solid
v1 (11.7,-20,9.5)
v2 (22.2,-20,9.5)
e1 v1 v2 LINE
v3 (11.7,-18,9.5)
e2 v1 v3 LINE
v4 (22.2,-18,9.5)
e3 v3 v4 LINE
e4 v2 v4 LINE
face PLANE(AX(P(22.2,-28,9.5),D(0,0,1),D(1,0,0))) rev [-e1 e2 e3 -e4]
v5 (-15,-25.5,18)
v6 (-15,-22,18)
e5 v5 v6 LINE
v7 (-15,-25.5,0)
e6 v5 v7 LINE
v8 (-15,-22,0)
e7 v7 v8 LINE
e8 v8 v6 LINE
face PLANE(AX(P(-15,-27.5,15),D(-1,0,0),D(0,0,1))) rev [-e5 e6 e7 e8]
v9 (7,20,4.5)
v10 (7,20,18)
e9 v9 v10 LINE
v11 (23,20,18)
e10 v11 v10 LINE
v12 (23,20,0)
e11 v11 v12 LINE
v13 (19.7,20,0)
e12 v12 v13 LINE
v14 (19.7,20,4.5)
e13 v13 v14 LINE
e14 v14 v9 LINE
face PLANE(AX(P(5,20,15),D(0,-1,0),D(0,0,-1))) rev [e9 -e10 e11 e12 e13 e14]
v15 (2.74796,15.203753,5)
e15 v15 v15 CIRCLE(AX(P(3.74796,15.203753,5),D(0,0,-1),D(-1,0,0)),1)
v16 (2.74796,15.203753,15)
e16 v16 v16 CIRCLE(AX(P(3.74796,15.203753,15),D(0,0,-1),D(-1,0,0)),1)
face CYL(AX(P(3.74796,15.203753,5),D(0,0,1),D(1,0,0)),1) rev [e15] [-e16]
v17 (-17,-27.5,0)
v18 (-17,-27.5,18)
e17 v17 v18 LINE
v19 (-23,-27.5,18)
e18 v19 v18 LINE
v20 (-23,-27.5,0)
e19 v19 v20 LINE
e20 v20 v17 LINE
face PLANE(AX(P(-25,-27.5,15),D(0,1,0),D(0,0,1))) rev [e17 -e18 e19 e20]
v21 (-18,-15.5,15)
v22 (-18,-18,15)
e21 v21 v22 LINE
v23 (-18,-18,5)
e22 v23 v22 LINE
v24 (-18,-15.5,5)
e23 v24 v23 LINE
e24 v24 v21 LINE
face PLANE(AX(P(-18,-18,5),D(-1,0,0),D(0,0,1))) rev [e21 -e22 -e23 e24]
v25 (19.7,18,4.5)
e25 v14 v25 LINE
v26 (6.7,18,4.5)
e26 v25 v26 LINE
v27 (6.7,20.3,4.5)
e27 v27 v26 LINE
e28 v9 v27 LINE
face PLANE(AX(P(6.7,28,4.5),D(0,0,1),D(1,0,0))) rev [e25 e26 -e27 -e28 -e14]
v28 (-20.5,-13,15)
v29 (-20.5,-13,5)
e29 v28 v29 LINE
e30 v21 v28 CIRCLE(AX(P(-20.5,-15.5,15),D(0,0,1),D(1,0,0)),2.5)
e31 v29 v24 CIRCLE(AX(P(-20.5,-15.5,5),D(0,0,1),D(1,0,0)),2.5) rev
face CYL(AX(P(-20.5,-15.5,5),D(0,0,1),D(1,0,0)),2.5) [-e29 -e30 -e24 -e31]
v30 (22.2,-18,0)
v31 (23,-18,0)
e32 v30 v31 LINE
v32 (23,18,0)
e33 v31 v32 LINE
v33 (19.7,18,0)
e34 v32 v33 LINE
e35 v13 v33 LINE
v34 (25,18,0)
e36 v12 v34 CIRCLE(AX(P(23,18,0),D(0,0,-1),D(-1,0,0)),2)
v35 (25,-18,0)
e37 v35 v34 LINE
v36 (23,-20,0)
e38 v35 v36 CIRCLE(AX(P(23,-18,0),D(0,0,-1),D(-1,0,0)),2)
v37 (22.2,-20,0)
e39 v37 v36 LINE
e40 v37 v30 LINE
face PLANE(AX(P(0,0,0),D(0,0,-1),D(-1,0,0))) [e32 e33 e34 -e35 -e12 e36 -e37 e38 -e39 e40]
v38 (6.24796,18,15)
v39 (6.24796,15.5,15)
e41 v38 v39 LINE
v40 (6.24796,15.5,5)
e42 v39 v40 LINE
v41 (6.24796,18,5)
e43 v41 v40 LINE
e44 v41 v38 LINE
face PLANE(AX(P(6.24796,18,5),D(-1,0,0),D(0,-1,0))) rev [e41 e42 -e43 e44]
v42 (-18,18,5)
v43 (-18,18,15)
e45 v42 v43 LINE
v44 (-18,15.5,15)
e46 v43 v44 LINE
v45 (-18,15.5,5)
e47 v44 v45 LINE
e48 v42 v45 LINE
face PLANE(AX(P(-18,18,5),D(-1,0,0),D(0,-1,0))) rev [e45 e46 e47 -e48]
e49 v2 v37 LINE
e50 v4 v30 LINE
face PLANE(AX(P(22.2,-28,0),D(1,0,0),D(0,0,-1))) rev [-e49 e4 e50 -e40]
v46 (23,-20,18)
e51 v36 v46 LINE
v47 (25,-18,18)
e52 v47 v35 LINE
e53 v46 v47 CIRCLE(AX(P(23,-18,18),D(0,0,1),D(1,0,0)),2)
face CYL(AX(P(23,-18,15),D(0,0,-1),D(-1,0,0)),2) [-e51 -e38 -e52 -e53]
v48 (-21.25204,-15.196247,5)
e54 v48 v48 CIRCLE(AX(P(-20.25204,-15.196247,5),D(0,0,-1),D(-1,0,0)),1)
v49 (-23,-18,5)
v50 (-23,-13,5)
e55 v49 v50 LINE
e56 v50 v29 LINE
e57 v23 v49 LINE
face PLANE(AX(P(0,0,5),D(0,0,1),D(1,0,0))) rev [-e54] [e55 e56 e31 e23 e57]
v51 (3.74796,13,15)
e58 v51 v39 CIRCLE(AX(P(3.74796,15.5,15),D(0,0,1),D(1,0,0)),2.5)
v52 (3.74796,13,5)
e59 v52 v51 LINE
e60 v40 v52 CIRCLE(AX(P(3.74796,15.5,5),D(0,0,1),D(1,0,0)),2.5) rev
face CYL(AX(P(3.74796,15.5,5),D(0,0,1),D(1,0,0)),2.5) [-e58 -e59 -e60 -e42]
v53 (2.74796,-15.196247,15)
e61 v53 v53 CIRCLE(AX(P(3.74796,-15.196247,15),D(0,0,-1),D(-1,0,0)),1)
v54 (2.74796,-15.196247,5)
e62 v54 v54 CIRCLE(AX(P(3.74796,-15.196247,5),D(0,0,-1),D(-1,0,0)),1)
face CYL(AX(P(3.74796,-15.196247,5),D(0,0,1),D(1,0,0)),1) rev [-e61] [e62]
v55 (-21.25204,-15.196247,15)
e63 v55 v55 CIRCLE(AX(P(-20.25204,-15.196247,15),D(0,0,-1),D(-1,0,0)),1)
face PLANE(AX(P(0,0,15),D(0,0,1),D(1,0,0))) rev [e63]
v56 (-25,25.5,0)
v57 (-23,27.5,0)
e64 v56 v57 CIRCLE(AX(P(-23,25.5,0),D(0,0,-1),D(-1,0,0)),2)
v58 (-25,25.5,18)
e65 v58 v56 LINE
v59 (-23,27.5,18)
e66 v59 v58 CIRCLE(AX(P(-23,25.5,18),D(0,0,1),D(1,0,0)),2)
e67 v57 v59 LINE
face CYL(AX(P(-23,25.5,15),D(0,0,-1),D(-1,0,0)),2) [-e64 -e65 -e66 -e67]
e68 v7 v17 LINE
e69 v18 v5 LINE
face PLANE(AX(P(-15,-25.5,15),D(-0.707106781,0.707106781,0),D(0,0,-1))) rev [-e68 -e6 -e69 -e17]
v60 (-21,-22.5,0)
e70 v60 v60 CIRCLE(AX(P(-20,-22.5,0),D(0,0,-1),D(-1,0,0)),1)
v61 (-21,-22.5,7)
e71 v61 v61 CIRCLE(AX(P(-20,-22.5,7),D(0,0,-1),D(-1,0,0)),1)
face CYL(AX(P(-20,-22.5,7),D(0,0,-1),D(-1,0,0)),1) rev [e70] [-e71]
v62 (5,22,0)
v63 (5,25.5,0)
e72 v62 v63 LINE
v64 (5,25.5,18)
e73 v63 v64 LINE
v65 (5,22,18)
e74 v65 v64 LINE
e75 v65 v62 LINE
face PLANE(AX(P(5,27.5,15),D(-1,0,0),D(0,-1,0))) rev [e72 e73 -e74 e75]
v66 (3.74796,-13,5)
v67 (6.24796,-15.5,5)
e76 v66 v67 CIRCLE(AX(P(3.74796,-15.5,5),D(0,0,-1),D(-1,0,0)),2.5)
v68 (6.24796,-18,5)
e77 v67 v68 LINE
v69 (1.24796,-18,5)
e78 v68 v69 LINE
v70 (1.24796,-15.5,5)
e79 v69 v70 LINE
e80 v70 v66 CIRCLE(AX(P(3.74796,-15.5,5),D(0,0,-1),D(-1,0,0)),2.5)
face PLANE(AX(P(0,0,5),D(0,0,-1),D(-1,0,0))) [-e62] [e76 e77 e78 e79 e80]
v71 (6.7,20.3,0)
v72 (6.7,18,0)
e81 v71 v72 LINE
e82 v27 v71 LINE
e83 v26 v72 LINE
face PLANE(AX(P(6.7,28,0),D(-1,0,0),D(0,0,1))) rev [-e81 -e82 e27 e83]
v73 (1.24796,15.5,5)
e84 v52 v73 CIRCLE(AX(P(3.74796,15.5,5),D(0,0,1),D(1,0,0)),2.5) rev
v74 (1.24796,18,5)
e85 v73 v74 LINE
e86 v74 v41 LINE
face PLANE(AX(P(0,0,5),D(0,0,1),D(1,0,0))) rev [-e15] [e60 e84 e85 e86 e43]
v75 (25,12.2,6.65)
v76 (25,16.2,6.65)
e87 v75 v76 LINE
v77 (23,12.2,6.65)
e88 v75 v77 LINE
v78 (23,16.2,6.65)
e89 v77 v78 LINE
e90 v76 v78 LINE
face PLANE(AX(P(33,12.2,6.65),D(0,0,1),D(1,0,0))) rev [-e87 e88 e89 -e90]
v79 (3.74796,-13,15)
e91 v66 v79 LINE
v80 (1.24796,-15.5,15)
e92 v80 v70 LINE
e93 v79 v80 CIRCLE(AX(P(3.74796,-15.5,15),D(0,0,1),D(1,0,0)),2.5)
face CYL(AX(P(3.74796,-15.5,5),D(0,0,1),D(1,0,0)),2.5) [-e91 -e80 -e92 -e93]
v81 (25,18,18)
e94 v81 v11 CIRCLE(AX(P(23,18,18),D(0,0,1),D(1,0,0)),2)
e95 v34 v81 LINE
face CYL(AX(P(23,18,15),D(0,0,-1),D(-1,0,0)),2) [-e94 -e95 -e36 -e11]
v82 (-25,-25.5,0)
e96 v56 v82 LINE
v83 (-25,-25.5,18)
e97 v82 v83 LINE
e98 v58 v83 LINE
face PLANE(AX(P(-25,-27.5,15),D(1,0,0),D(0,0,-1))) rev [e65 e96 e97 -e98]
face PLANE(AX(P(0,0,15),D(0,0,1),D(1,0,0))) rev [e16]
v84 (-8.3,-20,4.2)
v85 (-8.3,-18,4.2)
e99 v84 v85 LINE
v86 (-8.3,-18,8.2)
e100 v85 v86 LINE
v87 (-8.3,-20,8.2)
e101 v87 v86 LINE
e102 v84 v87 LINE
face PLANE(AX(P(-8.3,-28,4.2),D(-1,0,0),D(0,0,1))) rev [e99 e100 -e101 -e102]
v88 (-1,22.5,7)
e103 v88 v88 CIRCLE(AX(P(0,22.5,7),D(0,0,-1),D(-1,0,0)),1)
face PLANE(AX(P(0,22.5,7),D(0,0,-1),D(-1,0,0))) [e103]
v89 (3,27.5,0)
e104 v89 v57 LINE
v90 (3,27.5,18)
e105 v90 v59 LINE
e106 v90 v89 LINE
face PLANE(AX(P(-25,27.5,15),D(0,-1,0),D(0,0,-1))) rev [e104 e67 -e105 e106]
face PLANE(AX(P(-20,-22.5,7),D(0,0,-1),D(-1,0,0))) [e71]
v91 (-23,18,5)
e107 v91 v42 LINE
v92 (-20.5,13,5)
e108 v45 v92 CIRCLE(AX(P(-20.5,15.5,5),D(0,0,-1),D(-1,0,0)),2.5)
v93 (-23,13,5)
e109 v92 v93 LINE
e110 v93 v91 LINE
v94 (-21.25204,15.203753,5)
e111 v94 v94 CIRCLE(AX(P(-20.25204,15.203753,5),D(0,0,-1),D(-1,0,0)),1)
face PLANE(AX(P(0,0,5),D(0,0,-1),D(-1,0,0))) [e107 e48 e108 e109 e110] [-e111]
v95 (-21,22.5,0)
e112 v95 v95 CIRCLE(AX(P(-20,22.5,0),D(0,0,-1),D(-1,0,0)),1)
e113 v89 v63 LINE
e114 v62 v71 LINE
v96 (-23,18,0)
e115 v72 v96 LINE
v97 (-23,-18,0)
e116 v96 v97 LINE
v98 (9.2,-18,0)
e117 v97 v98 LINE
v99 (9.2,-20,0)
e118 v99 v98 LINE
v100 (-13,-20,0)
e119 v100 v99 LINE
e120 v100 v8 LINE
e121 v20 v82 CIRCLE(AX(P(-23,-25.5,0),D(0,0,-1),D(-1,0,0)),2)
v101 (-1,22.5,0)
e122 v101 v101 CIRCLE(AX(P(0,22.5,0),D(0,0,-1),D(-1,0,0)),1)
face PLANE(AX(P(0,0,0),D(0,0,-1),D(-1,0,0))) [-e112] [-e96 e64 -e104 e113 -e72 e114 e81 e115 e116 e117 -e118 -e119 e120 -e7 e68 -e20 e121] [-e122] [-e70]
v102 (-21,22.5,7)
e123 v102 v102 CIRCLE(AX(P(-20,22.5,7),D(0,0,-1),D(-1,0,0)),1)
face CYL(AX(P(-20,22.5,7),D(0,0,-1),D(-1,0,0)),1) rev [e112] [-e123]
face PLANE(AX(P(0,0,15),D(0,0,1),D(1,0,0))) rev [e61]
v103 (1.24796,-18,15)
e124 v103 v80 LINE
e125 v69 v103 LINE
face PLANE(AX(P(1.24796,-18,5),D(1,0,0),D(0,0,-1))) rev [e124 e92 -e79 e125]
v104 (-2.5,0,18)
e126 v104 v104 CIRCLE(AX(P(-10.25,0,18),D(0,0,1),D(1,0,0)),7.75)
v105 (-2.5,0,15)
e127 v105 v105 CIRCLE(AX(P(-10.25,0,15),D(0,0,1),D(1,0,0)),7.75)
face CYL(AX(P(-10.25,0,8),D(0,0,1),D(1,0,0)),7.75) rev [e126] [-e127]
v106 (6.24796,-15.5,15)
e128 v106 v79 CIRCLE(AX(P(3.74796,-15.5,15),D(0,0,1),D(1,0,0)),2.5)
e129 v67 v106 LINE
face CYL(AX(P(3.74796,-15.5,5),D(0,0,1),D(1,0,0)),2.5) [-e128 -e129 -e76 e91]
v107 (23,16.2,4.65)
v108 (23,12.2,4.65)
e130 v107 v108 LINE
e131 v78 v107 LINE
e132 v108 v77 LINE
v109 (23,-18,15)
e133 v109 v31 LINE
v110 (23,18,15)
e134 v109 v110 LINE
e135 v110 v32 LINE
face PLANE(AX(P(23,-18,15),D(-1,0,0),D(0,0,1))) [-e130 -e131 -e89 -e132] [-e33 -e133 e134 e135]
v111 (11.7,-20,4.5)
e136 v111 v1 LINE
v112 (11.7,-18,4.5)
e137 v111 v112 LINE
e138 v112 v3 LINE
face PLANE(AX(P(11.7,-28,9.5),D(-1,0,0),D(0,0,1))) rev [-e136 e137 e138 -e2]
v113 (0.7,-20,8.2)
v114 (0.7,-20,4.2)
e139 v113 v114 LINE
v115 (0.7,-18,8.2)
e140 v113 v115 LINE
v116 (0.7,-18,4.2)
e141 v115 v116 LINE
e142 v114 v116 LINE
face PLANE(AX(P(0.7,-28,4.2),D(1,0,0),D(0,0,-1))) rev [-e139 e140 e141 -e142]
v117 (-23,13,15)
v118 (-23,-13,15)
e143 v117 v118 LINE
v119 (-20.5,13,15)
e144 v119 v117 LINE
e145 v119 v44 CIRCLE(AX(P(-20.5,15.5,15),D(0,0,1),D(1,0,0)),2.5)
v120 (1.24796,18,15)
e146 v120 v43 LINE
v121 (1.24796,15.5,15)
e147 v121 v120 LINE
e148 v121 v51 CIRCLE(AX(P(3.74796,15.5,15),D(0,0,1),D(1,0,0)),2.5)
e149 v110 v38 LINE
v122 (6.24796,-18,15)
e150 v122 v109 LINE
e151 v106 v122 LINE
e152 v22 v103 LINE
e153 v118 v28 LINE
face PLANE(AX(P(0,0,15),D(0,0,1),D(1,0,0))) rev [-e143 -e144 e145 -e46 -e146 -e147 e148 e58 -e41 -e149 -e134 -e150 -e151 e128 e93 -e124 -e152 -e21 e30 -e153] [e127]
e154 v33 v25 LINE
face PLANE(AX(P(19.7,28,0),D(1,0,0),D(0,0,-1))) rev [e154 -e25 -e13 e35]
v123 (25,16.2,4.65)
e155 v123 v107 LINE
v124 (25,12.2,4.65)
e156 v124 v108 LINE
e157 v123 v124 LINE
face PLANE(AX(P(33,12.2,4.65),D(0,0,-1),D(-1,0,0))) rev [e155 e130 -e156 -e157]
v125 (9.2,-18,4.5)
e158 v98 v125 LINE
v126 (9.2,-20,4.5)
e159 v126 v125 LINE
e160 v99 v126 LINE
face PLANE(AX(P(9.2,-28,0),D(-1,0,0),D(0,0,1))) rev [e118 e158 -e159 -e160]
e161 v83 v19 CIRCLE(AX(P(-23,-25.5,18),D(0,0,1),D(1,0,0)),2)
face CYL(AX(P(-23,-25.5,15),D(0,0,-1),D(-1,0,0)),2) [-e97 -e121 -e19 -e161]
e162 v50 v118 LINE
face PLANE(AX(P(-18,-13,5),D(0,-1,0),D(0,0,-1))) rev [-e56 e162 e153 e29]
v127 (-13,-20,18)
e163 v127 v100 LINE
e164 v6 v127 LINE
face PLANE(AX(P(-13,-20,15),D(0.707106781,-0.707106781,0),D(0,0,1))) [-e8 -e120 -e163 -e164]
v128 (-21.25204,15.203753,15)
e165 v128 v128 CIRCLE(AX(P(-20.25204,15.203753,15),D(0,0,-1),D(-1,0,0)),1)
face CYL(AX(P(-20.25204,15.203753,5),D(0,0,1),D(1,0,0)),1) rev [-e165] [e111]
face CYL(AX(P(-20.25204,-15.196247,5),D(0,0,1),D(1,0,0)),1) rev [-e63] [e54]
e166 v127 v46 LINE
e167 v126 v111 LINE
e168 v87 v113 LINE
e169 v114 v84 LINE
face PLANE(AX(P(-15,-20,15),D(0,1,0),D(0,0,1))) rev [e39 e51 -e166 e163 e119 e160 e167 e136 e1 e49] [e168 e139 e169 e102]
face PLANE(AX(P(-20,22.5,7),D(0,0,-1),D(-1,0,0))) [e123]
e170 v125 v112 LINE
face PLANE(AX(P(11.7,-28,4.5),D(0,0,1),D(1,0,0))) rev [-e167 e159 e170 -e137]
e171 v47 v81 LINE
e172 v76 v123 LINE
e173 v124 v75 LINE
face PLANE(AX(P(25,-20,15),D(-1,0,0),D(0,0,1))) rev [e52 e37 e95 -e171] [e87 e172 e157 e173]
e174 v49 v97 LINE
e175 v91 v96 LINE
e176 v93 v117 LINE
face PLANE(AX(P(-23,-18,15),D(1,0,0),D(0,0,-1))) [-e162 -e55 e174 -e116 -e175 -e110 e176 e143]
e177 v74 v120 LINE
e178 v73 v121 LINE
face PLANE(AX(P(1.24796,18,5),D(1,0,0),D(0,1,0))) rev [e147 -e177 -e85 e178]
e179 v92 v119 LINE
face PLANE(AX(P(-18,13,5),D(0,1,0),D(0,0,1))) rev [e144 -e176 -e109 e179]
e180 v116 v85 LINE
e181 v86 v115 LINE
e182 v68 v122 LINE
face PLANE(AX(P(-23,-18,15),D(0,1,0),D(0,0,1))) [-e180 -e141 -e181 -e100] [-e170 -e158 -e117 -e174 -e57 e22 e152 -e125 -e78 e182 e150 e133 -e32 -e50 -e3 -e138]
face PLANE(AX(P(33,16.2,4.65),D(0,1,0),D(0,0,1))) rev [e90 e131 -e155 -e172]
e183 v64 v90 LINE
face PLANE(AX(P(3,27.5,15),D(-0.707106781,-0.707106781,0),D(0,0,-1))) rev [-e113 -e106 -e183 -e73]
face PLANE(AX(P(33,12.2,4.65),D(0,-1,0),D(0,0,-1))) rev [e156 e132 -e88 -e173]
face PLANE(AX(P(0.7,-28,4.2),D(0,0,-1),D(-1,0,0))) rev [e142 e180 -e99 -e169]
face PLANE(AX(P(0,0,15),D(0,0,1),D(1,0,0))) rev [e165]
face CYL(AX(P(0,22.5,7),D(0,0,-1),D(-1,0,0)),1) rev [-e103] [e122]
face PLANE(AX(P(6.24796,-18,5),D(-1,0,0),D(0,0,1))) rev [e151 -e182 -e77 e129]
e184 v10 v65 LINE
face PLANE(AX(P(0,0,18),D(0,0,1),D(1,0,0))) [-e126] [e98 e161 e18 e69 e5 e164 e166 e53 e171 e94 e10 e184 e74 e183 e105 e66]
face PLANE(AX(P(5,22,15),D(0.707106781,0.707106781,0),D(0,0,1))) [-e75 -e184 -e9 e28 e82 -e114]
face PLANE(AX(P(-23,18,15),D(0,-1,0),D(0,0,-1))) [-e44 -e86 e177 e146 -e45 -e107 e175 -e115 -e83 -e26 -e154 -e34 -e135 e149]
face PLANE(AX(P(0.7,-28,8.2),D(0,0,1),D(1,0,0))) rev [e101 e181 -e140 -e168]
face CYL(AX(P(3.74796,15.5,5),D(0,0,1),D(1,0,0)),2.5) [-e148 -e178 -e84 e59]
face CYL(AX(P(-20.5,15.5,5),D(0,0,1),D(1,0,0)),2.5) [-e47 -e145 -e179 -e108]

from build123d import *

# Parameters (mm, degrees)
SKETCH1_W           = 46
SKETCH1_H           = 36
BOSS_EXTRUDE1_DEPTH = 15
BOSS_EXTRUDE2_DEPTH = 3
SKETCH3_R           = 7.75
CUT_EXTRUDE1_DEPTH  = 10
SKETCH4_W           = 5
SKETCH4_H           = 5
SKETCH4_R           = 1
BOSS_EXTRUDE3_DEPTH = 10
FILLET1_R           = 2.5
SKETCH6_R           = 1
CUT_EXTRUDE2_DEPTH  = 10
CHAMFER1_SIZE       = 2
FILLET2_R           = 2
SKETCH7_W           = 13
SKETCH7_H           = 4.5
CUT_EXTRUDE3_DEPTH  = 10
SKETCH8_W           = 9
SKETCH8_H           = 4
CUT_EXTRUDE4_DEPTH  = 10
SKETCH9_W           = 2
SKETCH9_H           = 4
CUT_EXTRUDE5_DEPTH  = 10


with BuildPart() as part:
    # Sketch1 → Boss-Extrude1 (new body)
    with BuildSketch(Plane.XY):
        Polygon((-15, -27.5), (-15, -20), (25, -20), (25, 20), (5, 20), (5, 27.5), (-25, 27.5), (-25, -27.5), align=None)
        Rectangle(SKETCH1_W, SKETCH1_H, mode=Mode.SUBTRACT)
    extrude(amount=BOSS_EXTRUDE1_DEPTH)

    # Sketch2 → Boss-Extrude2 (add)
    with BuildSketch(Plane.XY.offset(15)):
        Polygon((-25, 27.5), (-25, -27.5), (-15, -27.5), (-15, -20), (25, -20), (25, 20), (5, 20), (5, 27.5), align=None)
    extrude(amount=BOSS_EXTRUDE2_DEPTH)

    # Sketch3 → Cut-Extrude1 (cut)
    with BuildSketch(Plane.XY.offset(18)):
        with Locations((-10.25, 0)):
            Circle(SKETCH3_R)
    extrude(amount=-CUT_EXTRUDE1_DEPTH, mode=Mode.SUBTRACT)

    # Sketch4 → Boss-Extrude3 (add)
    # profile 1 of 4: a face of its own
    with BuildSketch(Plane(origin=(0, 0, 15), x_dir=(-1, 0, 0), z_dir=(0, 0, -1))):
        with Locations((20.5, -15.5)):
            Rectangle(SKETCH4_W, SKETCH4_H)
        with Locations((20.252039878, -15.196246514)):
            Circle(SKETCH4_R, mode=Mode.SUBTRACT)
    # profile 2 of 4: a face of its own
    with BuildSketch(Plane(origin=(0, 0, 15), x_dir=(-1, 0, 0), z_dir=(0, 0, -1))):
        with Locations((-3.747960122, -15.5)):
            Rectangle(SKETCH4_W, SKETCH4_H)
        with Locations((-3.747960122, -15.196246514)):
            Circle(SKETCH4_R, mode=Mode.SUBTRACT)
    # profile 3 of 4: a face of its own
    with BuildSketch(Plane(origin=(0, 0, 15), x_dir=(-1, 0, 0), z_dir=(0, 0, -1))):
        with Locations((-3.747960122, 15.5)):
            Rectangle(SKETCH4_W, SKETCH4_H)
        with Locations((-3.747960122, 15.203753486)):
            Circle(SKETCH4_R, mode=Mode.SUBTRACT)
    # profile 4 of 4: a face of its own
    with BuildSketch(Plane(origin=(0, 0, 15), x_dir=(-1, 0, 0), z_dir=(0, 0, -1))):
        with Locations((20.5, 15.5)):
            Rectangle(SKETCH4_W, SKETCH4_H)
        with Locations((20.252039878, 15.203753486)):
            Circle(SKETCH4_R, mode=Mode.SUBTRACT)
    extrude(amount=BOSS_EXTRUDE3_DEPTH)

    # Fillet1
    fillet1_edges = [part.edges().sort_by_distance(p)[0] for p in [
        (1.247960122, 13, 10),
        (6.247960122, 13, 10),
        (-18, 13, 10),
        (-18, -13, 10),
        (1.247960122, -13, 10),
        (6.247960122, -13, 10),
    ]]
    fillet(fillet1_edges, radius=FILLET1_R - 0.0001)  # a hair under: the kernel refuses the full size

    # Sketch6 → Cut-Extrude2 (cut)
    with BuildSketch(Plane(origin=(0, 0, -3), x_dir=(-1, 0, 0), z_dir=(0, 0, -1))):
        with Locations((0, 22.5)):
            Circle(SKETCH6_R)
        with Locations((20, 22.5)):
            Circle(SKETCH6_R)
        with Locations((20, -22.5)):
            Circle(SKETCH6_R)
    extrude(amount=-CUT_EXTRUDE2_DEPTH, mode=Mode.SUBTRACT)

    # Chamfer1
    chamfer1_edges = [part.edges().sort_by_distance(p)[0] for p in [
        (5, 27.5, 9),
        (5, 20, 9),
        (-15, -20, 9),
        (-15, -27.5, 9),
    ]]
    chamfer(chamfer1_edges, length=CHAMFER1_SIZE)

    # Fillet2
    fillet2_edges = [part.edges().sort_by_distance(p)[0] for p in [
        (-25, 27.5, 9),
        (25, 20, 9),
        (25, -20, 9),
        (-25, -27.5, 9),
    ]]
    fillet(fillet2_edges, radius=FILLET2_R)

    # Sketch7 → Cut-Extrude3 (cut)
    with BuildSketch(Plane.XZ.offset(-18)):
        with Locations((13.2, 2.25)):
            Rectangle(SKETCH7_W, SKETCH7_H)
    extrude(amount=-CUT_EXTRUDE3_DEPTH, mode=Mode.SUBTRACT)

    # Sketch8 → Cut-Extrude4 (cut)
    with BuildSketch(Plane(origin=(0, -18, 0), x_dir=(1, 0, 0), z_dir=(0, 1, 0))):
        Polygon((22.2, 0), (9.2, 0), (9.2, -4.5), (11.7, -4.5), (11.7, -9.5), (22.2, -9.5), align=None)
        with Locations((-3.8, -6.2)):
            Rectangle(SKETCH8_W, SKETCH8_H)
    extrude(amount=-CUT_EXTRUDE4_DEPTH, mode=Mode.SUBTRACT)

    # Sketch9 → Cut-Extrude5 (cut)
    with BuildSketch(Plane.ZY.offset(-23)):
        with Locations((5.65, 14.2)):
            Rectangle(SKETCH9_W, SKETCH9_H)
    extrude(amount=-CUT_EXTRUDE5_DEPTH, mode=Mode.SUBTRACT)


solid = part.part
